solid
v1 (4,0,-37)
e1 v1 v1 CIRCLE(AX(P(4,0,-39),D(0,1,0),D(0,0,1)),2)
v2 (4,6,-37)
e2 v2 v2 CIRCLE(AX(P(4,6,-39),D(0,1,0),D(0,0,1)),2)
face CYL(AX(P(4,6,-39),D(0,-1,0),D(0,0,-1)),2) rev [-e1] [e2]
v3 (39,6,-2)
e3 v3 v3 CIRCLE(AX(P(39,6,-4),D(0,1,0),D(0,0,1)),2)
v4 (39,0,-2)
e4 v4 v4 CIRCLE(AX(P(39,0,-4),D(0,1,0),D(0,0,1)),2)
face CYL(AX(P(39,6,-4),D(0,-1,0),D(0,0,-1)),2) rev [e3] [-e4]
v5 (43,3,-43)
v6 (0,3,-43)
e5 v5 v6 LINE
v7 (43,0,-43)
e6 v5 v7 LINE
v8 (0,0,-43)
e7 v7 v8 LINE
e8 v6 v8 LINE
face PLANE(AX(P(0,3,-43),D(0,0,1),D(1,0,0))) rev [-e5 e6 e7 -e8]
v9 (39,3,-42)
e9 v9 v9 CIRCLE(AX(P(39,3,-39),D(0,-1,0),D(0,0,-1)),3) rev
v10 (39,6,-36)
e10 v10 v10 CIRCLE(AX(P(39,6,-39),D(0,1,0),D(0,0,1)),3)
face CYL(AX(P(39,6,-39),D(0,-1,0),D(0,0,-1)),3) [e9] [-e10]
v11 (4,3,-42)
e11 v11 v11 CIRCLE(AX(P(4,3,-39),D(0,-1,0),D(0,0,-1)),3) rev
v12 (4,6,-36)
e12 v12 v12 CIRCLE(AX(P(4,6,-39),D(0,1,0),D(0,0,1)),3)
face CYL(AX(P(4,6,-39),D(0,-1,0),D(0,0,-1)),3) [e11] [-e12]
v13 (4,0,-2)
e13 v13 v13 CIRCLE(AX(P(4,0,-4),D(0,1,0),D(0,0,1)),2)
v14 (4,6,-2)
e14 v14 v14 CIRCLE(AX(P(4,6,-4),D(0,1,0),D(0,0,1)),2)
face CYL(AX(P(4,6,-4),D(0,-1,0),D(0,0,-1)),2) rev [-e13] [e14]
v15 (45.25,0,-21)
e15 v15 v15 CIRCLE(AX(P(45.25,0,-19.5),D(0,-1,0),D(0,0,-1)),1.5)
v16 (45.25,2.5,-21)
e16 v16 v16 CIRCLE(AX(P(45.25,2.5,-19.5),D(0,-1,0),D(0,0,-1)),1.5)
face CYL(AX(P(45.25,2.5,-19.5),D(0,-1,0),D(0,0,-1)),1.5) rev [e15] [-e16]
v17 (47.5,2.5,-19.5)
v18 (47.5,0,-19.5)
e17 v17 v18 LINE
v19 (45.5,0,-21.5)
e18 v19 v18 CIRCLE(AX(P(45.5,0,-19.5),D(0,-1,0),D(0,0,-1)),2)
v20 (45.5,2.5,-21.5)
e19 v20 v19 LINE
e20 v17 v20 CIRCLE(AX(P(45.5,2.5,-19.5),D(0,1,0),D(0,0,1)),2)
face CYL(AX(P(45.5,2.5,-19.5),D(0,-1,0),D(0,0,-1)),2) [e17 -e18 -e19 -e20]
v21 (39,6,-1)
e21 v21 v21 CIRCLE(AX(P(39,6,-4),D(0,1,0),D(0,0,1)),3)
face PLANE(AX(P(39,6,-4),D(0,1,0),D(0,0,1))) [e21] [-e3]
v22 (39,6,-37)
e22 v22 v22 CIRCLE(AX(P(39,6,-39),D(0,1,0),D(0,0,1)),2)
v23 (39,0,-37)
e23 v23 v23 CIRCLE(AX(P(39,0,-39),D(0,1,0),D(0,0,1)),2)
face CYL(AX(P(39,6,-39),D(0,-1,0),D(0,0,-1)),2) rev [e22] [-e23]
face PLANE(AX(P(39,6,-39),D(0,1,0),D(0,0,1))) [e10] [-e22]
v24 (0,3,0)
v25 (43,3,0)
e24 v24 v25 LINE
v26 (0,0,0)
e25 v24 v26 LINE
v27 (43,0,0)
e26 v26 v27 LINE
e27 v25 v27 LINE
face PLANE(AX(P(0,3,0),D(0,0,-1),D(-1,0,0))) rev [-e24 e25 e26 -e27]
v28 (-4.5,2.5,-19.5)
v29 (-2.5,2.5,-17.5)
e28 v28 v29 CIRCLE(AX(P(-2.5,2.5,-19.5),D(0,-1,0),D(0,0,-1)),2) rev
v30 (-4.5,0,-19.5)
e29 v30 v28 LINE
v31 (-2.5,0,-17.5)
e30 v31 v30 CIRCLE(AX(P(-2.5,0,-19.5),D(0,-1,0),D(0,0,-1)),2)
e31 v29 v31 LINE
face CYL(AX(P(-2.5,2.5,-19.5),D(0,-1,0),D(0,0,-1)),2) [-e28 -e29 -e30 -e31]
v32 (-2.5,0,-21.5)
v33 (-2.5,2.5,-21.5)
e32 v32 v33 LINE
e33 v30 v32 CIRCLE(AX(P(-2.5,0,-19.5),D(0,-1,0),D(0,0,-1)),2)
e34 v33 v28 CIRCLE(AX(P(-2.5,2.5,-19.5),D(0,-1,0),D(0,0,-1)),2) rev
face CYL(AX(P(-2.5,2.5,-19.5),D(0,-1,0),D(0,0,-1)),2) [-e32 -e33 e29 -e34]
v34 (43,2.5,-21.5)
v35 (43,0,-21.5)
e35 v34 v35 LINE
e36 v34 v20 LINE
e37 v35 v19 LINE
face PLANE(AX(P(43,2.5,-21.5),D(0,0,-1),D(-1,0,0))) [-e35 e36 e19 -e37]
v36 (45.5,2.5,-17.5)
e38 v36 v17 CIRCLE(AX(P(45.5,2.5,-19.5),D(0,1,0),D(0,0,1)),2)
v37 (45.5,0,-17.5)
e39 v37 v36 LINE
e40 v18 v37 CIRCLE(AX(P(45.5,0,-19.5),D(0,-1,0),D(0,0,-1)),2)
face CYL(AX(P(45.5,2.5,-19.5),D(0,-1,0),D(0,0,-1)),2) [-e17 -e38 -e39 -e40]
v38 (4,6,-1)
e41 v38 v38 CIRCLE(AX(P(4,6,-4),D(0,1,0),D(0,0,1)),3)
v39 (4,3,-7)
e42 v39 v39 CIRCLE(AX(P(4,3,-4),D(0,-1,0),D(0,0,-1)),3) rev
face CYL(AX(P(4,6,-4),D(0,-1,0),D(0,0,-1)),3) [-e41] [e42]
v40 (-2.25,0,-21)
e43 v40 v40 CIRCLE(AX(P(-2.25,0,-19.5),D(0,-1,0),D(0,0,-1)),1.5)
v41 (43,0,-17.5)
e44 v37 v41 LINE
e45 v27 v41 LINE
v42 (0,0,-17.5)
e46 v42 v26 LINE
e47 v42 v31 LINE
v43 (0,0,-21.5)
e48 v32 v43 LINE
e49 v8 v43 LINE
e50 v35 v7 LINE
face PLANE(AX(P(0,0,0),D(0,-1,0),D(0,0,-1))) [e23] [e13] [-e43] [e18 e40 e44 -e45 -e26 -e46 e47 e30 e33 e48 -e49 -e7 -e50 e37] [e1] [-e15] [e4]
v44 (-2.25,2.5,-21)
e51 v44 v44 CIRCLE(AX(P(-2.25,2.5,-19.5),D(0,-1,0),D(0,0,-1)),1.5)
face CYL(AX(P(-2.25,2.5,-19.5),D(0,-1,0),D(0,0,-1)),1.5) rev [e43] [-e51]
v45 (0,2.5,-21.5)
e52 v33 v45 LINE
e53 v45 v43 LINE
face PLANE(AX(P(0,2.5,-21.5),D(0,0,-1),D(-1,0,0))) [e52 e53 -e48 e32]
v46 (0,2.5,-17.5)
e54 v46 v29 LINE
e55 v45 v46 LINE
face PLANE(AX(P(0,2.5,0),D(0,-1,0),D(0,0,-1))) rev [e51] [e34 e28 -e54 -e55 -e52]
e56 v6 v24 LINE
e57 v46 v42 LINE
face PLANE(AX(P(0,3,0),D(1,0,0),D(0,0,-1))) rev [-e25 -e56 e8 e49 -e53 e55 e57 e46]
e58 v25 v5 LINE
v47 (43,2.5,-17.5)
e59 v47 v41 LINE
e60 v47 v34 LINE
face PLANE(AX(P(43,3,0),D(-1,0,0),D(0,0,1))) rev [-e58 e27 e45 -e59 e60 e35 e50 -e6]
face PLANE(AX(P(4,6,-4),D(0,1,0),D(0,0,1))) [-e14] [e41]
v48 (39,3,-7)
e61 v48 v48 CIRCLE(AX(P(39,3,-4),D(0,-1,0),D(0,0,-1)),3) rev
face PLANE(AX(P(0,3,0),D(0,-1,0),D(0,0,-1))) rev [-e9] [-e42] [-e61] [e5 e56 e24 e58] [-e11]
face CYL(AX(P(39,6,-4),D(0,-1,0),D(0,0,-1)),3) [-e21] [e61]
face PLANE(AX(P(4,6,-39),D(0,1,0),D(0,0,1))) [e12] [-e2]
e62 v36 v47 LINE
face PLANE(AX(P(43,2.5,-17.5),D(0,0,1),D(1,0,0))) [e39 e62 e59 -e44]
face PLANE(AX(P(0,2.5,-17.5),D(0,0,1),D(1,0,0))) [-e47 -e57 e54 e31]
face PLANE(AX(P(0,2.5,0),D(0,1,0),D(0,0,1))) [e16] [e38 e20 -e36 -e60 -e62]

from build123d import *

# Parameters (mm, degrees)
SKETCH1_W            = 43
SKETCH1_H            = 43
BOSS_EXTRUDE1_DEPTH  = 3
SKETCH2_R            = 3
SKETCH2_R_2          = 2
BOSS_EXTRUDE5_DEPTH  = 3
SKETCH2_9_R          = 3
SKETCH2_9_R_2        = 2
BOSS_EXTRUDE6_DEPTH  = 3
SKETCH2_10_R         = 3
SKETCH2_10_R_2       = 2
BOSS_EXTRUDE7_DEPTH  = 3
SKETCH2_11_R         = 3
SKETCH2_11_R_2       = 2
BOSS_EXTRUDE8_DEPTH  = 3
SKETCH3_W            = 4.5
SKETCH3_H            = 4
SKETCH3_R            = 1.5
BOSS_EXTRUDE9_DEPTH  = 2.5
FILLET2_R            = 2
SKETCH4_W            = 4.5
SKETCH4_H            = 4
SKETCH4_R            = 1.5
BOSS_EXTRUDE10_DEPTH = 2.5
FILLET3_R            = 2
SKETCH7_R            = 2
CUT_EXTRUDE1_DEPTH   = 65.142419661
SKETCH2_13_R         = 2
CUT_EXTRUDE2_DEPTH   = 65.142419661
SKETCH2_14_R         = 2
CUT_EXTRUDE3_DEPTH   = 65.142419661


with BuildPart() as part:
    # Sketch1 → Boss-Extrude1 (new body)
    with BuildSketch(Plane(origin=(0, 0, 0), x_dir=(1, 0, 0), z_dir=(0, 1, 0))):
        with Locations((21.5, 21.5)):
            Rectangle(SKETCH1_W, SKETCH1_H)
    extrude(amount=BOSS_EXTRUDE1_DEPTH)

    # Sketch2 → Boss-Extrude5 (add)
    with BuildSketch(Plane(origin=(0, 3, 0), x_dir=(1, 0, 0), z_dir=(0, 1, 0))):
        with Locations(Location((4, 39, 0), (0, 0, 90))):
            Circle(SKETCH2_R)
        with Locations(Location((4, 39, 0), (0, 0, 270))):
            Circle(SKETCH2_R_2, mode=Mode.SUBTRACT)
    extrude(amount=BOSS_EXTRUDE5_DEPTH)

    # Sketch2<9> → Boss-Extrude6 (add)
    with BuildSketch(Plane(origin=(0, 3, 0), x_dir=(1, 0, 0), z_dir=(0, 1, 0))):
        with Locations(Location((39, 39, 0), (0, 0, 90))):
            Circle(SKETCH2_9_R)
        with Locations(Location((39, 39, 0), (0, 0, 270))):
            Circle(SKETCH2_9_R_2, mode=Mode.SUBTRACT)
    extrude(amount=BOSS_EXTRUDE6_DEPTH)

    # Sketch2<10> → Boss-Extrude7 (add)
    with BuildSketch(Plane(origin=(0, 3, 0), x_dir=(1, 0, 0), z_dir=(0, 1, 0))):
        with Locations(Location((4, 4, 0), (0, 0, 90))):
            Circle(SKETCH2_10_R)
        with Locations(Location((4, 4, 0), (0, 0, 270))):
            Circle(SKETCH2_10_R_2, mode=Mode.SUBTRACT)
    extrude(amount=BOSS_EXTRUDE7_DEPTH)

    # Sketch2<11> → Boss-Extrude8 (add)
    with BuildSketch(Plane(origin=(0, 3, 0), x_dir=(1, 0, 0), z_dir=(0, 1, 0))):
        with Locations(Location((39, 4, 0), (0, 0, 90))):
            Circle(SKETCH2_11_R)
        with Locations(Location((39, 4, 0), (0, 0, 270))):
            Circle(SKETCH2_11_R_2, mode=Mode.SUBTRACT)
    extrude(amount=BOSS_EXTRUDE8_DEPTH)

    # Sketch3 → Boss-Extrude9 (add)
    with BuildSketch(Plane.XZ):
        with Locations((-2.25, -19.5)):
            Rectangle(SKETCH3_W, SKETCH3_H)
        with Locations(Location((-2.25, -19.5, 0), (0, 0, 270))):
            Circle(SKETCH3_R, mode=Mode.SUBTRACT)
    extrude(amount=-BOSS_EXTRUDE9_DEPTH)

    # Fillet2
    fillet2_edges = [part.edges().sort_by_distance(p)[0] for p in [
        (-4.5, 1.25, -21.5),
        (-4.5, 1.25, -17.5),
    ]]
    fillet(fillet2_edges, radius=FILLET2_R - 0.0001)  # a hair under: the kernel refuses the full size

    # Sketch4 → Boss-Extrude10 (add)
    with BuildSketch(Plane.XZ):
        with Locations((45.25, -19.5)):
            Rectangle(SKETCH4_W, SKETCH4_H)
        with Locations(Location((45.25, -19.5, 0), (0, 0, 270))):
            Circle(SKETCH4_R, mode=Mode.SUBTRACT)
    extrude(amount=-BOSS_EXTRUDE10_DEPTH)

    # Fillet3
    fillet3_edges = [part.edges().sort_by_distance(p)[0] for p in [
        (47.5, 1.25, -21.5),
        (47.5, 1.25, -17.5),
    ]]
    fillet(fillet3_edges, radius=FILLET3_R - 0.0001)  # a hair under: the kernel refuses the full size

    # Sketch7 → Cut-Extrude1 (cut, through all)
    with BuildSketch(Plane(origin=(0, 3, 0), x_dir=(1, 0, 0), z_dir=(0, 1, 0))):
        with Locations(Location((4, 39, 0), (0, 0, 270))):
            Circle(SKETCH7_R)
    extrude(amount=-CUT_EXTRUDE1_DEPTH, mode=Mode.SUBTRACT)

    # Sketch2<13> → Cut-Extrude2 (cut, through all)
    with BuildSketch(Plane(origin=(0, 3, 0), x_dir=(1, 0, 0), z_dir=(0, 1, 0))):
        with Locations(Location((39, 39, 0), (0, 0, 270))):
            Circle(SKETCH2_13_R)
    extrude(amount=-CUT_EXTRUDE2_DEPTH, mode=Mode.SUBTRACT)

    # Sketch2<14> → Cut-Extrude3 (cut, through all)
    with BuildSketch(Plane(origin=(0, 3, 0), x_dir=(1, 0, 0), z_dir=(0, 1, 0))):
        with Locations(Location((4, 4, 0), (0, 0, 270))):
            Circle(SKETCH2_14_R)
        with Locations(Location((39, 4, 0), (0, 0, 270))):
            Circle(SKETCH2_14_R)
    extrude(amount=-CUT_EXTRUDE3_DEPTH, mode=Mode.SUBTRACT)


solid = part.part
